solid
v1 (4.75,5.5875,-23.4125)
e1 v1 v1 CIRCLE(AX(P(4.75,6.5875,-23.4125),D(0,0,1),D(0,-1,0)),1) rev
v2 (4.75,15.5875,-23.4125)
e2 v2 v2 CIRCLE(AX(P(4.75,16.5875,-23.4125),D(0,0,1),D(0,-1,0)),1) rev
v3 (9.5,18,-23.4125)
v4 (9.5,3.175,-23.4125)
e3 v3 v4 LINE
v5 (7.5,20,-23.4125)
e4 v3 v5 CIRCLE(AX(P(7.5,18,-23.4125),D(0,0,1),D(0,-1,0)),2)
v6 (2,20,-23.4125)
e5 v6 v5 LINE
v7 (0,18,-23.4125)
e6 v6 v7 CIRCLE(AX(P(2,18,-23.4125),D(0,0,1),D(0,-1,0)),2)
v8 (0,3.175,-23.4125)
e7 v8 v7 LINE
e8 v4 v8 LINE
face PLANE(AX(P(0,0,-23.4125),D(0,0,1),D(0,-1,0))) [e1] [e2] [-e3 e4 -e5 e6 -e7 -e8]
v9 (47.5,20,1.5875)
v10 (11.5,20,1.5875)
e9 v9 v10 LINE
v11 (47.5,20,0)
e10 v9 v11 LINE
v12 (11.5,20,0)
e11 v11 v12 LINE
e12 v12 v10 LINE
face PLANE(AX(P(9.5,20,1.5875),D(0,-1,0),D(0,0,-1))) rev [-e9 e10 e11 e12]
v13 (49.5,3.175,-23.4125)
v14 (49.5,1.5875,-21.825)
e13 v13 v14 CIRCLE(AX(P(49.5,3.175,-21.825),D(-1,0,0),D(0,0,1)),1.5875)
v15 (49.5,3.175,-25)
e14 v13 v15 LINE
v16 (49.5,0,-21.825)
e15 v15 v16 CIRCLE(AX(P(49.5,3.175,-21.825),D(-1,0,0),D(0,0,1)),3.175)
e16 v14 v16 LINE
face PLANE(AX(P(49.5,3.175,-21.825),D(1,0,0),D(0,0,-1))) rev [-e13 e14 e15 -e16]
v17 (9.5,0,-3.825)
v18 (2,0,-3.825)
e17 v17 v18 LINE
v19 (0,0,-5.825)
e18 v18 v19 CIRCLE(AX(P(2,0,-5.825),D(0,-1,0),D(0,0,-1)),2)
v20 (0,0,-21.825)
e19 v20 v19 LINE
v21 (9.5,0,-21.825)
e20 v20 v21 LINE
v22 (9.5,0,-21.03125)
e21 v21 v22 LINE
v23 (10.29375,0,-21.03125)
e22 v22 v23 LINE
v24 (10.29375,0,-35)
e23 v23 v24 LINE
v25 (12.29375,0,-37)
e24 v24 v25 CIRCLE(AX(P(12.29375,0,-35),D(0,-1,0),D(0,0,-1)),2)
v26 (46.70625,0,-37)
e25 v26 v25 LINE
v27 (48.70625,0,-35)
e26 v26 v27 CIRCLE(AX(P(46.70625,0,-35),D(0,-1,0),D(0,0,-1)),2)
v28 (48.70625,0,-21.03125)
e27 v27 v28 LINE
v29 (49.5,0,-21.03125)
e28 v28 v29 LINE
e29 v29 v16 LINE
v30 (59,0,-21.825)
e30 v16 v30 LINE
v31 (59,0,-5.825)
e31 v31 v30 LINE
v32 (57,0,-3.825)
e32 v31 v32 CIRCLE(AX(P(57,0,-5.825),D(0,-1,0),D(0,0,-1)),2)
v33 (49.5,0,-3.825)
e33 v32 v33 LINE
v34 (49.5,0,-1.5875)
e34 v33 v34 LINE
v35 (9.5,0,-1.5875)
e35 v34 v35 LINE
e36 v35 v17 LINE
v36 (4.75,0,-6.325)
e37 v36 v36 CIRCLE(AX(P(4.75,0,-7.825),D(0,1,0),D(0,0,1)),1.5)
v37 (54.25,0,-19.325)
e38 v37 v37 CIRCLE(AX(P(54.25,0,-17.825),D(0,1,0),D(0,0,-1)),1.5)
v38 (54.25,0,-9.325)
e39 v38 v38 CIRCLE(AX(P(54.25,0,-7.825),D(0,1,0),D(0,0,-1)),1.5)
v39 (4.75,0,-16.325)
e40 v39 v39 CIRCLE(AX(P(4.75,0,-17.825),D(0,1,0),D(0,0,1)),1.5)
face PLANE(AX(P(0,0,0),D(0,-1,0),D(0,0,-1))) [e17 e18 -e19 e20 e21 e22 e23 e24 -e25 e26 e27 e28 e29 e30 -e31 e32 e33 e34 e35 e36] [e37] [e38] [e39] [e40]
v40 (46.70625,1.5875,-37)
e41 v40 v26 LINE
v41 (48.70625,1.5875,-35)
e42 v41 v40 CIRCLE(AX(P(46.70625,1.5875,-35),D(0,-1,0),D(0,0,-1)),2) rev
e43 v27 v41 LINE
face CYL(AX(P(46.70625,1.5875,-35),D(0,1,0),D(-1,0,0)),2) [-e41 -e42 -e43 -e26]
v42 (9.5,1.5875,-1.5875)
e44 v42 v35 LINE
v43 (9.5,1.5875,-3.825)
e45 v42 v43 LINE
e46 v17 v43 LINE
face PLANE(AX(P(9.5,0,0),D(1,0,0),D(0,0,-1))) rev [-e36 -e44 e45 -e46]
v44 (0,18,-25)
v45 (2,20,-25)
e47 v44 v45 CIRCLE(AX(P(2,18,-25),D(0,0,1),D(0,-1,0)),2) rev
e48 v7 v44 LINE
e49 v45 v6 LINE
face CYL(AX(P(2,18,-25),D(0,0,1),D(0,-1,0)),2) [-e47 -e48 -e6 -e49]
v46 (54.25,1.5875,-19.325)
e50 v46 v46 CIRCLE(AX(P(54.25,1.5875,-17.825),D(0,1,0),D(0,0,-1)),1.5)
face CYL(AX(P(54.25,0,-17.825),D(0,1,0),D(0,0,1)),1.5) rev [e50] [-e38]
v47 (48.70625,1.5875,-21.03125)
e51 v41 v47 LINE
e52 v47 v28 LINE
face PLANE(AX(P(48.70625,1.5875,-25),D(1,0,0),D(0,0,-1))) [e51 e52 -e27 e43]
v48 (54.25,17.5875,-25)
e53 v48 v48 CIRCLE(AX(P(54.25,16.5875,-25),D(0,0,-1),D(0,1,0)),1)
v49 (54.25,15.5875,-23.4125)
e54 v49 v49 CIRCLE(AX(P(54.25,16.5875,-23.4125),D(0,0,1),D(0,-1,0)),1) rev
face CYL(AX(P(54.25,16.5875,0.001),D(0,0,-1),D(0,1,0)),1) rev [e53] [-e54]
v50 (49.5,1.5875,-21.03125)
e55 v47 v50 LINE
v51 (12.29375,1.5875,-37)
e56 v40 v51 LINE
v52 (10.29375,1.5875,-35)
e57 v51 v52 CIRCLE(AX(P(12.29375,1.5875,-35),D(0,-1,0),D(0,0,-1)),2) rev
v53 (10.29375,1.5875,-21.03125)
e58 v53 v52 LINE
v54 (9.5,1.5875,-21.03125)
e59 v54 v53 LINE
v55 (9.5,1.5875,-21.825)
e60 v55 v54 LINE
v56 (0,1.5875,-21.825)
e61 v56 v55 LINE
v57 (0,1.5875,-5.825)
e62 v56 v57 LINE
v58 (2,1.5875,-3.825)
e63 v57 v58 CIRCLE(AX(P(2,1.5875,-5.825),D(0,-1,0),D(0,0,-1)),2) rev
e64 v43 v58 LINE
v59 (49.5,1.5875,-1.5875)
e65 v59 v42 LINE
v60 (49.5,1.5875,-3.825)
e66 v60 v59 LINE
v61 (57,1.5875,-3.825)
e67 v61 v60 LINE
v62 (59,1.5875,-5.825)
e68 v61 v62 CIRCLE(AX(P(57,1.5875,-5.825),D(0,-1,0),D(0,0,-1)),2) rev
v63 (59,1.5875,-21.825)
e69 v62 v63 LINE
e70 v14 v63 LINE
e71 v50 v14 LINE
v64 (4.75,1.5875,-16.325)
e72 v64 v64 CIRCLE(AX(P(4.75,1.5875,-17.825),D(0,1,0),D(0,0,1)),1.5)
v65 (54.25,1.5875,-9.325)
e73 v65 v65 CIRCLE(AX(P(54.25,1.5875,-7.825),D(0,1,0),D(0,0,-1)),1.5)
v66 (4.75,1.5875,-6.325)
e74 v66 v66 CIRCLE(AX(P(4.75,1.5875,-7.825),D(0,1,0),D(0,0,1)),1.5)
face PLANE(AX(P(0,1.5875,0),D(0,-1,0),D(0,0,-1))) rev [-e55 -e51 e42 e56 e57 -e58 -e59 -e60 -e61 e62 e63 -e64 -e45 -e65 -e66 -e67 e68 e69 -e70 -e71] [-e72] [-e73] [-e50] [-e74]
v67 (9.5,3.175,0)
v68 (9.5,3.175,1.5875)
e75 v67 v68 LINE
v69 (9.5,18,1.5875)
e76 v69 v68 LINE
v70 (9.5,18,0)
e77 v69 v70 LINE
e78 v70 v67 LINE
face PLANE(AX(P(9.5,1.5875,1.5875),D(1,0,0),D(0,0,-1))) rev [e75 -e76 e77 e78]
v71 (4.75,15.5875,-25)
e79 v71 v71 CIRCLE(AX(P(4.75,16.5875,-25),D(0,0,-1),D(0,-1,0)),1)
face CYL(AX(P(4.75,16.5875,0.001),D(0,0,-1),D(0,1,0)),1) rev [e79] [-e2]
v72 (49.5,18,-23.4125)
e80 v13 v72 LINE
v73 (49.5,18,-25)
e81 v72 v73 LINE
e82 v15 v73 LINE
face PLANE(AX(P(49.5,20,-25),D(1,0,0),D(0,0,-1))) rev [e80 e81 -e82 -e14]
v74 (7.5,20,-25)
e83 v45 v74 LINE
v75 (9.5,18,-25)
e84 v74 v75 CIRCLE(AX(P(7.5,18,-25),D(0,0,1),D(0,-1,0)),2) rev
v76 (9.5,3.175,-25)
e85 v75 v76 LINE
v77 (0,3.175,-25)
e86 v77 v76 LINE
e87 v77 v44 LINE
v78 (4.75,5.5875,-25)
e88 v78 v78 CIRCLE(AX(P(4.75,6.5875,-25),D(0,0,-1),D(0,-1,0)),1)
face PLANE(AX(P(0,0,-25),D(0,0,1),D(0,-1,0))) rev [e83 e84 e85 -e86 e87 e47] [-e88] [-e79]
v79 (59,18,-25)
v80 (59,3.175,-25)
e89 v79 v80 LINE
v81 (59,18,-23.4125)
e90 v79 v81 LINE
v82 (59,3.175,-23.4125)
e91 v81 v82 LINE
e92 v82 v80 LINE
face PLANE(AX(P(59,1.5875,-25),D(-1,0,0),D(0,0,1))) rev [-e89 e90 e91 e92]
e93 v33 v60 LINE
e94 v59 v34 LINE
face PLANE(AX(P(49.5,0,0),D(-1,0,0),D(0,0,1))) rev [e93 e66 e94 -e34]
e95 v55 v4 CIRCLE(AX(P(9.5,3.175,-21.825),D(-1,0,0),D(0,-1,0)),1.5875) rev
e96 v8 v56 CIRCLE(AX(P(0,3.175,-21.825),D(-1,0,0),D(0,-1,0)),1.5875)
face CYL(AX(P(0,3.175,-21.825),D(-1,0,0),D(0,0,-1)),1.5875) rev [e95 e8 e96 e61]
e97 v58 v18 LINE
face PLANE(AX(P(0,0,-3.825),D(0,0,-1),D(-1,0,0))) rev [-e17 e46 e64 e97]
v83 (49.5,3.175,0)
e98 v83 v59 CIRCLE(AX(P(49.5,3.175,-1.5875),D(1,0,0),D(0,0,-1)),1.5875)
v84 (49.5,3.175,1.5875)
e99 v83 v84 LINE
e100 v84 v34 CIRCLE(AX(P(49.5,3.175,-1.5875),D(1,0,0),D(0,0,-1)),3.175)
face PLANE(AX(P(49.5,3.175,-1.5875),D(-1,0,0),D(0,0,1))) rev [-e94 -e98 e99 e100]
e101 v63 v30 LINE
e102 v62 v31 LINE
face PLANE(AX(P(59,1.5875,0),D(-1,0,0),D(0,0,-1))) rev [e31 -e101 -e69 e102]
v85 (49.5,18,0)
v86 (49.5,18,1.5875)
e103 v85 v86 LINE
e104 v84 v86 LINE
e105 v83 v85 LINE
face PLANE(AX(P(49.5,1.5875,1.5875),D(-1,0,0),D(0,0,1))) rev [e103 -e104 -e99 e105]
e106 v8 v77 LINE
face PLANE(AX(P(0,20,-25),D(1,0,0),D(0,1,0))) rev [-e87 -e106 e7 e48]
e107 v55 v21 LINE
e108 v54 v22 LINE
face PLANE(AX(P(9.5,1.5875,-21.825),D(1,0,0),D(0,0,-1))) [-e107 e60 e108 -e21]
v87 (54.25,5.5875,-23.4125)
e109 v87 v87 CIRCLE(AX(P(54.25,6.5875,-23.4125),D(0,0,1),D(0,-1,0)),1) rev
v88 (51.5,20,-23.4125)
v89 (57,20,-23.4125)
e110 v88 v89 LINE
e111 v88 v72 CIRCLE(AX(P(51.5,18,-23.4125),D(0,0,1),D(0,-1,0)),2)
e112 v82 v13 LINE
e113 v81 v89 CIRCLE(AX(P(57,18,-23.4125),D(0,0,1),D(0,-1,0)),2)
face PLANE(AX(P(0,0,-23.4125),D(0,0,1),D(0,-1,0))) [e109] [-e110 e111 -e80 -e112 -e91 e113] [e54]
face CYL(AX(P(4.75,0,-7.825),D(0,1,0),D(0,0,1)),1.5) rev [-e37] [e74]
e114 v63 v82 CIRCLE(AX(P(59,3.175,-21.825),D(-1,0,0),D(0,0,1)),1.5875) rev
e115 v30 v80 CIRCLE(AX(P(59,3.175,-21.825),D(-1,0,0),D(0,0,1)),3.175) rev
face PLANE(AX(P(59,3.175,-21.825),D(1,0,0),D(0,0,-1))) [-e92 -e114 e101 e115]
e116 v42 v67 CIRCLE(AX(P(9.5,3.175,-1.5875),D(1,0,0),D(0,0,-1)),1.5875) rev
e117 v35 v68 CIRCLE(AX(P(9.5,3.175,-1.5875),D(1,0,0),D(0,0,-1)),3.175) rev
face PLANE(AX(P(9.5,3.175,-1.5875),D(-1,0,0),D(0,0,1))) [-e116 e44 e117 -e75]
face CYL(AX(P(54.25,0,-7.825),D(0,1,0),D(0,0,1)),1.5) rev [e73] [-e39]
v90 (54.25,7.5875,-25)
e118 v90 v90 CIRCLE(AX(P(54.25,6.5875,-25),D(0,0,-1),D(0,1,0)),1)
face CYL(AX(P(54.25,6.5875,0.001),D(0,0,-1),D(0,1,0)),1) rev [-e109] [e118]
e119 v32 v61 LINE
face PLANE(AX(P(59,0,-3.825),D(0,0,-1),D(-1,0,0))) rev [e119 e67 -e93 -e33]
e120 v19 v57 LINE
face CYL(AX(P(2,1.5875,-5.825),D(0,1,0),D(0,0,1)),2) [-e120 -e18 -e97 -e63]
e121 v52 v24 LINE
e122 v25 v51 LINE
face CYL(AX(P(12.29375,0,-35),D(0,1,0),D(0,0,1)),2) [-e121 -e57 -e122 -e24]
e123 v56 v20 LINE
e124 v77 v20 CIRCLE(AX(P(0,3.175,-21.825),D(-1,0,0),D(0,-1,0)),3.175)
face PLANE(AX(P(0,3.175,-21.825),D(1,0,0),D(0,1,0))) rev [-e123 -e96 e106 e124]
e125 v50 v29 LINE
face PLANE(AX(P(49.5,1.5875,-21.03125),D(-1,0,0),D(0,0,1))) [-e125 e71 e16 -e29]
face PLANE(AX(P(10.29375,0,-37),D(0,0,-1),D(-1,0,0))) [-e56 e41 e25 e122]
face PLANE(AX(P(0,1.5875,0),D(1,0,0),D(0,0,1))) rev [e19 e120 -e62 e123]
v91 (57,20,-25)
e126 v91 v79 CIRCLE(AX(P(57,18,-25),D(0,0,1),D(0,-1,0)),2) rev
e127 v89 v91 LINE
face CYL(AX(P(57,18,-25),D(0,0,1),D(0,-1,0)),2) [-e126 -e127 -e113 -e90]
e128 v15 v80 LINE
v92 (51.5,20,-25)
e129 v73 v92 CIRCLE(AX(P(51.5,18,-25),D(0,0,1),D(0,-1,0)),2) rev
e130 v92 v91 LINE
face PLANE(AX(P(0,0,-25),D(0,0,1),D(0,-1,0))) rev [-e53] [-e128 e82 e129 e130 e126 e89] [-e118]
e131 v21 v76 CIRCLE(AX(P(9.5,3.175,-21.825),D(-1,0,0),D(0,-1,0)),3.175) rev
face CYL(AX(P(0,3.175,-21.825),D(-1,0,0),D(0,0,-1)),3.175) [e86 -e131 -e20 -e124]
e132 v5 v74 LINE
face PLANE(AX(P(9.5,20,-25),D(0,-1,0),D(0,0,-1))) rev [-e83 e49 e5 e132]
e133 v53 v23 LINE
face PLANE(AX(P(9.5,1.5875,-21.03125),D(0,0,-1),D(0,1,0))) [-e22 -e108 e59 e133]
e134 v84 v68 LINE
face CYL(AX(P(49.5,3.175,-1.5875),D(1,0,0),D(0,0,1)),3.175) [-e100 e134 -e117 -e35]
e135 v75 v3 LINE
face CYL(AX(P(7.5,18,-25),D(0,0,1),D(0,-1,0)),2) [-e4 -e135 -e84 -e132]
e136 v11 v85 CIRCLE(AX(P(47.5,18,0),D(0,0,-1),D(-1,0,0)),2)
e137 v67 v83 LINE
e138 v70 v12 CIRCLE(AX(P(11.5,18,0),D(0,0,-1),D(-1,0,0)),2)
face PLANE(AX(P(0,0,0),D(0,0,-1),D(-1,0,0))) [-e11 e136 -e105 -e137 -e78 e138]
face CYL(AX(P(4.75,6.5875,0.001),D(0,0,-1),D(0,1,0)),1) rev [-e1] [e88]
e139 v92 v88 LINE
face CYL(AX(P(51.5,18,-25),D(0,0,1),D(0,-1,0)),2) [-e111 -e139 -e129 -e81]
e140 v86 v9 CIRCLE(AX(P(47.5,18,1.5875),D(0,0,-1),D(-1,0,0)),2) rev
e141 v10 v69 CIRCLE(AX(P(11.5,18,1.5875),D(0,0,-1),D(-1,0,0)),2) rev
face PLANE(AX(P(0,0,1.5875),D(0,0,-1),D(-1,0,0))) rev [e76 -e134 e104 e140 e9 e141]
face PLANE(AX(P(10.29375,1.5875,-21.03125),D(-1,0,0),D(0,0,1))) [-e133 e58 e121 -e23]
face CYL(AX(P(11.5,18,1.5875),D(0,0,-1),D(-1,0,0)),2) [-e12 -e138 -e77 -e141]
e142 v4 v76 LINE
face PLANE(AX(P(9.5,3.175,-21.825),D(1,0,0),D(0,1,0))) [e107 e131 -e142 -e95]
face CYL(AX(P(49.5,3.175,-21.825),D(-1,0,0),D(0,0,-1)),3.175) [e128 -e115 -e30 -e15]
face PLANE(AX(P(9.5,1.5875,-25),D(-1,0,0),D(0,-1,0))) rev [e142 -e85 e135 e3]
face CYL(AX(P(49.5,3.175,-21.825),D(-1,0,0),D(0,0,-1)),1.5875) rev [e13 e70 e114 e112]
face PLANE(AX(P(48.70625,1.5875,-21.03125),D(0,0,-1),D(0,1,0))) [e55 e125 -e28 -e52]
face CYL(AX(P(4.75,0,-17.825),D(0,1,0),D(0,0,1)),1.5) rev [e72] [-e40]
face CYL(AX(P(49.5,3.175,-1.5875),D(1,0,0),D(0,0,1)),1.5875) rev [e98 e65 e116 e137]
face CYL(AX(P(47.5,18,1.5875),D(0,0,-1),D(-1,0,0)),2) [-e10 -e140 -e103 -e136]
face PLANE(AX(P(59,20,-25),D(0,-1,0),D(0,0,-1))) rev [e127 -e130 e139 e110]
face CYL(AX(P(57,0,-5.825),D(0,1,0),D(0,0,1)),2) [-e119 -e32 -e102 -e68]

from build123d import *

# Parameters (mm, degrees)
SKETCH2_W                     = 59
SKETCH2_H                     = 25
BOSS_EXTRUDE1_DEPTH           = 1.5875
EDGE_FLANGE2_STRIP_W          = 9.525
EDGE_FLANGE2_STRIP_H          = 1.5875
EDGE_FLANGE2_STRIP_CUT_DEPTH  = 9.5
EDGE_FLANGE2_RELIEF_W         = 10.31875
EDGE_FLANGE2_RELIEF_H         = 0.79375
EDGE_FLANGE2_RELIEF_CUT_DEPTH = 1.5875
EDGE_FLANGE2_DEPTH            = 9.5
EDGE_FLANGE3_STRIP_W          = 9.525
EDGE_FLANGE3_STRIP_H          = 1.5875
EDGE_FLANGE3_STRIP_CUT_DEPTH  = 9.5
EDGE_FLANGE3_RELIEF_W         = 10.31875
EDGE_FLANGE3_RELIEF_H         = 0.79375
EDGE_FLANGE3_RELIEF_CUT_DEPTH = 1.5875
EDGE_FLANGE3_DEPTH            = 9.5
CUT_EXTRUDE1_REACH            = 69.127
SKETCH16_R                    = 1
SKETCH18_W                    = 38.4125
SKETCH18_H                    = 12
BOSS_EXTRUDE2_DEPTH           = 1.5875
SKETCH19_R                    = 1.5
SKETCH19_W                    = 9.5
SKETCH19_H                    = 3.825
CUT_EXTRUDE2_DEPTH            = 1.5875
EDGE_FLANGE4_STRIP_W          = 9.525
EDGE_FLANGE4_STRIP_H          = 1.5875
EDGE_FLANGE4_STRIP_CUT_DEPTH  = 40
EDGE_FLANGE4_DEPTH            = 40
FILLET1_R                     = 2


# Sheet-metal steps are written as plain solids
with BuildPart() as part:
    # Sketch2 → Boss-Extrude1 (new body)
    with BuildSketch(Plane(origin=(0, 0, 0), x_dir=(1, 0, 0), z_dir=(0, 1, 0))):
        with Locations((29.5, 12.5)):
            Rectangle(SKETCH2_W, SKETCH2_H)
    extrude(amount=BOSS_EXTRUDE1_DEPTH)

    # Edge-Flange2 strip (across the edge) → Edge-Flange2 strip cut (cut)
    with BuildSketch(Plane(origin=(59, 1.5875, -25), x_dir=(0, 0, 1), z_dir=(-1, 0, 0))):
        with Locations((-1.5875, -0.79375)):
            Rectangle(EDGE_FLANGE2_STRIP_W, EDGE_FLANGE2_STRIP_H)
    extrude(amount=EDGE_FLANGE2_STRIP_CUT_DEPTH, mode=Mode.SUBTRACT)

    # Edge-Flange2 relief (on the sheet) → Edge-Flange2 relief cut (cut)
    with BuildSketch(Plane(origin=(59, 1.5875, -21.825), x_dir=(0, 0, 1), z_dir=(0, 1, 0))):
        with Locations((-4.365625, -9.896875)):
            Rectangle(EDGE_FLANGE2_RELIEF_W, EDGE_FLANGE2_RELIEF_H)
    extrude(amount=-EDGE_FLANGE2_RELIEF_CUT_DEPTH, mode=Mode.SUBTRACT)

    # Edge-Flange2 section (across the edge) → Edge-Flange2 (add)
    with BuildSketch(Plane(origin=(59, 1.5875, -25), x_dir=(0, 0, 1), z_dir=(-1, 0, 0))):
        with BuildLine():
            Line((0, 1.5875), (0, 18.4125))
            Line((0, 18.4125), (1.5875, 18.4125))
            Line((1.5875, 18.4125), (1.5875, 1.5875))
            ThreePointArc((1.5875, 1.5875), (2.052467985, 0.464967985), (3.175, 0))
            Line((3.175, 0), (3.175, -1.5875))
            ThreePointArc((3.175, -1.5875), (0.92993597, -0.65756403), (0, 1.5875))
        make_face()
    extrude(amount=EDGE_FLANGE2_DEPTH)

    # Edge-Flange3 strip (across the edge) → Edge-Flange3 strip cut (cut)
    with BuildSketch(Plane(origin=(9.5, 1.5875, -25), x_dir=(0, 0, 1), z_dir=(-1, 0, 0))):
        with Locations((-1.5875, -0.79375)):
            Rectangle(EDGE_FLANGE3_STRIP_W, EDGE_FLANGE3_STRIP_H)
    extrude(amount=EDGE_FLANGE3_STRIP_CUT_DEPTH, mode=Mode.SUBTRACT)

    # Edge-Flange3 relief (on the sheet) → Edge-Flange3 relief cut (cut)
    with BuildSketch(Plane(origin=(9.5, 1.5875, -21.825), x_dir=(0, 0, 1), z_dir=(0, 1, 0))):
        with Locations((-4.365625, 0.396875)):
            Rectangle(EDGE_FLANGE3_RELIEF_W, EDGE_FLANGE3_RELIEF_H)
    extrude(amount=-EDGE_FLANGE3_RELIEF_CUT_DEPTH, mode=Mode.SUBTRACT)

    # Edge-Flange3 section (across the edge) → Edge-Flange3 (add)
    with BuildSketch(Plane(origin=(9.5, 1.5875, -25), x_dir=(0, 0, 1), z_dir=(-1, 0, 0))):
        with BuildLine():
            Line((0, 1.5875), (0, 18.4125))
            Line((0, 18.4125), (1.5875, 18.4125))
            Line((1.5875, 18.4125), (1.5875, 1.5875))
            ThreePointArc((1.5875, 1.5875), (2.052467985, 0.464967985), (3.175, 0))
            Line((3.175, 0), (3.175, -1.5875))
            ThreePointArc((3.175, -1.5875), (0.92993597, -0.65756403), (0, 1.5875))
        make_face()
    extrude(amount=EDGE_FLANGE3_DEPTH)

    # Sketch16 → Cut-Extrude1 (cut, up to next)
    with BuildSketch(Plane(origin=(0, 0, -25), x_dir=(-1, 0, 0), z_dir=(0, 0, -1)), mode=Mode.PRIVATE) as cut_extrude1_sk1:
        with Locations(Location((-54.25, 16.5875, 0), (0, 0, 90))):
            Circle(SKETCH16_R)
    cut_extrude1_tool1 = extrude(cut_extrude1_sk1.sketch, amount=-CUT_EXTRUDE1_REACH, mode=Mode.PRIVATE) & part.part
    # Sketch16 → Cut-Extrude1 (cut, up to next)
    with BuildSketch(Plane(origin=(0, 0, -25), x_dir=(-1, 0, 0), z_dir=(0, 0, -1)), mode=Mode.PRIVATE) as cut_extrude1_sk2:
        with Locations(Location((-54.25, 6.5875, 0), (0, 0, 90))):
            Circle(SKETCH16_R)
    cut_extrude1_tool2 = extrude(cut_extrude1_sk2.sketch, amount=-CUT_EXTRUDE1_REACH, mode=Mode.PRIVATE) & part.part
    # Sketch16 → Cut-Extrude1 (cut, up to next)
    with BuildSketch(Plane(origin=(0, 0, -25), x_dir=(-1, 0, 0), z_dir=(0, 0, -1)), mode=Mode.PRIVATE) as cut_extrude1_sk3:
        with Locations(Location((-4.75, 6.5875, 0), (0, 0, 270))):
            Circle(SKETCH16_R)
    cut_extrude1_tool3 = extrude(cut_extrude1_sk3.sketch, amount=-CUT_EXTRUDE1_REACH, mode=Mode.PRIVATE) & part.part
    # Sketch16 → Cut-Extrude1 (cut, up to next)
    with BuildSketch(Plane(origin=(0, 0, -25), x_dir=(-1, 0, 0), z_dir=(0, 0, -1)), mode=Mode.PRIVATE) as cut_extrude1_sk4:
        with Locations(Location((-4.75, 16.5875, 0), (0, 0, 270))):
            Circle(SKETCH16_R)
    cut_extrude1_tool4 = extrude(cut_extrude1_sk4.sketch, amount=-CUT_EXTRUDE1_REACH, mode=Mode.PRIVATE) & part.part
    add(cut_extrude1_tool1.solids().sort_by_distance((54.25, 16.5875, -25))[0], mode=Mode.SUBTRACT)
    add(cut_extrude1_tool2.solids().sort_by_distance((54.25, 6.5875, -25))[0], mode=Mode.SUBTRACT)
    add(cut_extrude1_tool3.solids().sort_by_distance((4.75, 6.5875, -25))[0], mode=Mode.SUBTRACT)
    add(cut_extrude1_tool4.solids().sort_by_distance((4.75, 16.5875, -25))[0], mode=Mode.SUBTRACT)

    # Sketch18 → Boss-Extrude2 (add)
    with BuildSketch(Plane(origin=(0, 1.5875, 0), x_dir=(1, 0, 0), z_dir=(0, 1, 0))):
        with Locations((29.5, 31)):
            Rectangle(SKETCH18_W, SKETCH18_H)
    extrude(amount=-BOSS_EXTRUDE2_DEPTH)

    # Sketch19 → Cut-Extrude2 (cut)
    with BuildSketch(Plane(origin=(0, 1.5875, 0), x_dir=(1, 0, 0), z_dir=(0, 1, 0))):
        with Locations(Location((4.75, 17.825, 0), (0, 0, 270))):
            Circle(SKETCH19_R)
        with Locations(Location((4.75, 7.825, 0), (0, 0, 270))):
            Circle(SKETCH19_R)
        with Locations(Location((54.25, 17.825, 0), (0, 0, 90))):
            Circle(SKETCH19_R)
        with Locations(Location((54.25, 7.825, 0), (0, 0, 90))):
            Circle(SKETCH19_R)
        with Locations((54.25, 1.9125)):
            Rectangle(SKETCH19_W, SKETCH19_H)
        with Locations((4.75, 1.9125)):
            Rectangle(SKETCH19_W, SKETCH19_H)
    extrude(amount=-CUT_EXTRUDE2_DEPTH, mode=Mode.SUBTRACT)

    # Edge-Flange4 strip (across the edge) → Edge-Flange4 strip cut (cut)
    with BuildSketch(Plane(origin=(9.5, 1.5875, 0), x_dir=(0, 0, -1), z_dir=(1, 0, 0))):
        with Locations((-3.175, -0.79375)):
            Rectangle(EDGE_FLANGE4_STRIP_W, EDGE_FLANGE4_STRIP_H)
    extrude(amount=EDGE_FLANGE4_STRIP_CUT_DEPTH, mode=Mode.SUBTRACT)

    # Edge-Flange4 section (across the edge) → Edge-Flange4 (add)
    with BuildSketch(Plane(origin=(9.5, 1.5875, 0), x_dir=(0, 0, -1), z_dir=(1, 0, 0))):
        with BuildLine():
            Line((-1.5875, 1.5875), (-1.5875, 18.4125))
            Line((-1.5875, 18.4125), (0, 18.4125))
            Line((0, 18.4125), (0, 1.5875))
            ThreePointArc((0, 1.5875), (0.464967985, 0.464967985), (1.5875, 0))
            Line((1.5875, 0), (1.5875, -1.5875))
            ThreePointArc((1.5875, -1.5875), (-0.65756403, -0.65756403), (-1.5875, 1.5875))
        make_face()
    extrude(amount=EDGE_FLANGE4_DEPTH)

    # Fillet1
    fillet1_edges = [part.edges().sort_by_distance(p)[0] for p in [
        (10.29375, 0.79375, -37),
        (48.70625, 0.79375, -37),
        (0, 0.79375, -3.825),
        (59, 0.79375, -3.825),
        (9.5, 20, 0.79375),
        (49.5, 20, 0.79375),
        (59, 20, -24.20625),
        (49.5, 20, -24.20625),
        (9.5, 20, -24.20625),
        (0, 20, -24.20625),
    ]]
    fillet(fillet1_edges, radius=FILLET1_R)


solid = part.part
